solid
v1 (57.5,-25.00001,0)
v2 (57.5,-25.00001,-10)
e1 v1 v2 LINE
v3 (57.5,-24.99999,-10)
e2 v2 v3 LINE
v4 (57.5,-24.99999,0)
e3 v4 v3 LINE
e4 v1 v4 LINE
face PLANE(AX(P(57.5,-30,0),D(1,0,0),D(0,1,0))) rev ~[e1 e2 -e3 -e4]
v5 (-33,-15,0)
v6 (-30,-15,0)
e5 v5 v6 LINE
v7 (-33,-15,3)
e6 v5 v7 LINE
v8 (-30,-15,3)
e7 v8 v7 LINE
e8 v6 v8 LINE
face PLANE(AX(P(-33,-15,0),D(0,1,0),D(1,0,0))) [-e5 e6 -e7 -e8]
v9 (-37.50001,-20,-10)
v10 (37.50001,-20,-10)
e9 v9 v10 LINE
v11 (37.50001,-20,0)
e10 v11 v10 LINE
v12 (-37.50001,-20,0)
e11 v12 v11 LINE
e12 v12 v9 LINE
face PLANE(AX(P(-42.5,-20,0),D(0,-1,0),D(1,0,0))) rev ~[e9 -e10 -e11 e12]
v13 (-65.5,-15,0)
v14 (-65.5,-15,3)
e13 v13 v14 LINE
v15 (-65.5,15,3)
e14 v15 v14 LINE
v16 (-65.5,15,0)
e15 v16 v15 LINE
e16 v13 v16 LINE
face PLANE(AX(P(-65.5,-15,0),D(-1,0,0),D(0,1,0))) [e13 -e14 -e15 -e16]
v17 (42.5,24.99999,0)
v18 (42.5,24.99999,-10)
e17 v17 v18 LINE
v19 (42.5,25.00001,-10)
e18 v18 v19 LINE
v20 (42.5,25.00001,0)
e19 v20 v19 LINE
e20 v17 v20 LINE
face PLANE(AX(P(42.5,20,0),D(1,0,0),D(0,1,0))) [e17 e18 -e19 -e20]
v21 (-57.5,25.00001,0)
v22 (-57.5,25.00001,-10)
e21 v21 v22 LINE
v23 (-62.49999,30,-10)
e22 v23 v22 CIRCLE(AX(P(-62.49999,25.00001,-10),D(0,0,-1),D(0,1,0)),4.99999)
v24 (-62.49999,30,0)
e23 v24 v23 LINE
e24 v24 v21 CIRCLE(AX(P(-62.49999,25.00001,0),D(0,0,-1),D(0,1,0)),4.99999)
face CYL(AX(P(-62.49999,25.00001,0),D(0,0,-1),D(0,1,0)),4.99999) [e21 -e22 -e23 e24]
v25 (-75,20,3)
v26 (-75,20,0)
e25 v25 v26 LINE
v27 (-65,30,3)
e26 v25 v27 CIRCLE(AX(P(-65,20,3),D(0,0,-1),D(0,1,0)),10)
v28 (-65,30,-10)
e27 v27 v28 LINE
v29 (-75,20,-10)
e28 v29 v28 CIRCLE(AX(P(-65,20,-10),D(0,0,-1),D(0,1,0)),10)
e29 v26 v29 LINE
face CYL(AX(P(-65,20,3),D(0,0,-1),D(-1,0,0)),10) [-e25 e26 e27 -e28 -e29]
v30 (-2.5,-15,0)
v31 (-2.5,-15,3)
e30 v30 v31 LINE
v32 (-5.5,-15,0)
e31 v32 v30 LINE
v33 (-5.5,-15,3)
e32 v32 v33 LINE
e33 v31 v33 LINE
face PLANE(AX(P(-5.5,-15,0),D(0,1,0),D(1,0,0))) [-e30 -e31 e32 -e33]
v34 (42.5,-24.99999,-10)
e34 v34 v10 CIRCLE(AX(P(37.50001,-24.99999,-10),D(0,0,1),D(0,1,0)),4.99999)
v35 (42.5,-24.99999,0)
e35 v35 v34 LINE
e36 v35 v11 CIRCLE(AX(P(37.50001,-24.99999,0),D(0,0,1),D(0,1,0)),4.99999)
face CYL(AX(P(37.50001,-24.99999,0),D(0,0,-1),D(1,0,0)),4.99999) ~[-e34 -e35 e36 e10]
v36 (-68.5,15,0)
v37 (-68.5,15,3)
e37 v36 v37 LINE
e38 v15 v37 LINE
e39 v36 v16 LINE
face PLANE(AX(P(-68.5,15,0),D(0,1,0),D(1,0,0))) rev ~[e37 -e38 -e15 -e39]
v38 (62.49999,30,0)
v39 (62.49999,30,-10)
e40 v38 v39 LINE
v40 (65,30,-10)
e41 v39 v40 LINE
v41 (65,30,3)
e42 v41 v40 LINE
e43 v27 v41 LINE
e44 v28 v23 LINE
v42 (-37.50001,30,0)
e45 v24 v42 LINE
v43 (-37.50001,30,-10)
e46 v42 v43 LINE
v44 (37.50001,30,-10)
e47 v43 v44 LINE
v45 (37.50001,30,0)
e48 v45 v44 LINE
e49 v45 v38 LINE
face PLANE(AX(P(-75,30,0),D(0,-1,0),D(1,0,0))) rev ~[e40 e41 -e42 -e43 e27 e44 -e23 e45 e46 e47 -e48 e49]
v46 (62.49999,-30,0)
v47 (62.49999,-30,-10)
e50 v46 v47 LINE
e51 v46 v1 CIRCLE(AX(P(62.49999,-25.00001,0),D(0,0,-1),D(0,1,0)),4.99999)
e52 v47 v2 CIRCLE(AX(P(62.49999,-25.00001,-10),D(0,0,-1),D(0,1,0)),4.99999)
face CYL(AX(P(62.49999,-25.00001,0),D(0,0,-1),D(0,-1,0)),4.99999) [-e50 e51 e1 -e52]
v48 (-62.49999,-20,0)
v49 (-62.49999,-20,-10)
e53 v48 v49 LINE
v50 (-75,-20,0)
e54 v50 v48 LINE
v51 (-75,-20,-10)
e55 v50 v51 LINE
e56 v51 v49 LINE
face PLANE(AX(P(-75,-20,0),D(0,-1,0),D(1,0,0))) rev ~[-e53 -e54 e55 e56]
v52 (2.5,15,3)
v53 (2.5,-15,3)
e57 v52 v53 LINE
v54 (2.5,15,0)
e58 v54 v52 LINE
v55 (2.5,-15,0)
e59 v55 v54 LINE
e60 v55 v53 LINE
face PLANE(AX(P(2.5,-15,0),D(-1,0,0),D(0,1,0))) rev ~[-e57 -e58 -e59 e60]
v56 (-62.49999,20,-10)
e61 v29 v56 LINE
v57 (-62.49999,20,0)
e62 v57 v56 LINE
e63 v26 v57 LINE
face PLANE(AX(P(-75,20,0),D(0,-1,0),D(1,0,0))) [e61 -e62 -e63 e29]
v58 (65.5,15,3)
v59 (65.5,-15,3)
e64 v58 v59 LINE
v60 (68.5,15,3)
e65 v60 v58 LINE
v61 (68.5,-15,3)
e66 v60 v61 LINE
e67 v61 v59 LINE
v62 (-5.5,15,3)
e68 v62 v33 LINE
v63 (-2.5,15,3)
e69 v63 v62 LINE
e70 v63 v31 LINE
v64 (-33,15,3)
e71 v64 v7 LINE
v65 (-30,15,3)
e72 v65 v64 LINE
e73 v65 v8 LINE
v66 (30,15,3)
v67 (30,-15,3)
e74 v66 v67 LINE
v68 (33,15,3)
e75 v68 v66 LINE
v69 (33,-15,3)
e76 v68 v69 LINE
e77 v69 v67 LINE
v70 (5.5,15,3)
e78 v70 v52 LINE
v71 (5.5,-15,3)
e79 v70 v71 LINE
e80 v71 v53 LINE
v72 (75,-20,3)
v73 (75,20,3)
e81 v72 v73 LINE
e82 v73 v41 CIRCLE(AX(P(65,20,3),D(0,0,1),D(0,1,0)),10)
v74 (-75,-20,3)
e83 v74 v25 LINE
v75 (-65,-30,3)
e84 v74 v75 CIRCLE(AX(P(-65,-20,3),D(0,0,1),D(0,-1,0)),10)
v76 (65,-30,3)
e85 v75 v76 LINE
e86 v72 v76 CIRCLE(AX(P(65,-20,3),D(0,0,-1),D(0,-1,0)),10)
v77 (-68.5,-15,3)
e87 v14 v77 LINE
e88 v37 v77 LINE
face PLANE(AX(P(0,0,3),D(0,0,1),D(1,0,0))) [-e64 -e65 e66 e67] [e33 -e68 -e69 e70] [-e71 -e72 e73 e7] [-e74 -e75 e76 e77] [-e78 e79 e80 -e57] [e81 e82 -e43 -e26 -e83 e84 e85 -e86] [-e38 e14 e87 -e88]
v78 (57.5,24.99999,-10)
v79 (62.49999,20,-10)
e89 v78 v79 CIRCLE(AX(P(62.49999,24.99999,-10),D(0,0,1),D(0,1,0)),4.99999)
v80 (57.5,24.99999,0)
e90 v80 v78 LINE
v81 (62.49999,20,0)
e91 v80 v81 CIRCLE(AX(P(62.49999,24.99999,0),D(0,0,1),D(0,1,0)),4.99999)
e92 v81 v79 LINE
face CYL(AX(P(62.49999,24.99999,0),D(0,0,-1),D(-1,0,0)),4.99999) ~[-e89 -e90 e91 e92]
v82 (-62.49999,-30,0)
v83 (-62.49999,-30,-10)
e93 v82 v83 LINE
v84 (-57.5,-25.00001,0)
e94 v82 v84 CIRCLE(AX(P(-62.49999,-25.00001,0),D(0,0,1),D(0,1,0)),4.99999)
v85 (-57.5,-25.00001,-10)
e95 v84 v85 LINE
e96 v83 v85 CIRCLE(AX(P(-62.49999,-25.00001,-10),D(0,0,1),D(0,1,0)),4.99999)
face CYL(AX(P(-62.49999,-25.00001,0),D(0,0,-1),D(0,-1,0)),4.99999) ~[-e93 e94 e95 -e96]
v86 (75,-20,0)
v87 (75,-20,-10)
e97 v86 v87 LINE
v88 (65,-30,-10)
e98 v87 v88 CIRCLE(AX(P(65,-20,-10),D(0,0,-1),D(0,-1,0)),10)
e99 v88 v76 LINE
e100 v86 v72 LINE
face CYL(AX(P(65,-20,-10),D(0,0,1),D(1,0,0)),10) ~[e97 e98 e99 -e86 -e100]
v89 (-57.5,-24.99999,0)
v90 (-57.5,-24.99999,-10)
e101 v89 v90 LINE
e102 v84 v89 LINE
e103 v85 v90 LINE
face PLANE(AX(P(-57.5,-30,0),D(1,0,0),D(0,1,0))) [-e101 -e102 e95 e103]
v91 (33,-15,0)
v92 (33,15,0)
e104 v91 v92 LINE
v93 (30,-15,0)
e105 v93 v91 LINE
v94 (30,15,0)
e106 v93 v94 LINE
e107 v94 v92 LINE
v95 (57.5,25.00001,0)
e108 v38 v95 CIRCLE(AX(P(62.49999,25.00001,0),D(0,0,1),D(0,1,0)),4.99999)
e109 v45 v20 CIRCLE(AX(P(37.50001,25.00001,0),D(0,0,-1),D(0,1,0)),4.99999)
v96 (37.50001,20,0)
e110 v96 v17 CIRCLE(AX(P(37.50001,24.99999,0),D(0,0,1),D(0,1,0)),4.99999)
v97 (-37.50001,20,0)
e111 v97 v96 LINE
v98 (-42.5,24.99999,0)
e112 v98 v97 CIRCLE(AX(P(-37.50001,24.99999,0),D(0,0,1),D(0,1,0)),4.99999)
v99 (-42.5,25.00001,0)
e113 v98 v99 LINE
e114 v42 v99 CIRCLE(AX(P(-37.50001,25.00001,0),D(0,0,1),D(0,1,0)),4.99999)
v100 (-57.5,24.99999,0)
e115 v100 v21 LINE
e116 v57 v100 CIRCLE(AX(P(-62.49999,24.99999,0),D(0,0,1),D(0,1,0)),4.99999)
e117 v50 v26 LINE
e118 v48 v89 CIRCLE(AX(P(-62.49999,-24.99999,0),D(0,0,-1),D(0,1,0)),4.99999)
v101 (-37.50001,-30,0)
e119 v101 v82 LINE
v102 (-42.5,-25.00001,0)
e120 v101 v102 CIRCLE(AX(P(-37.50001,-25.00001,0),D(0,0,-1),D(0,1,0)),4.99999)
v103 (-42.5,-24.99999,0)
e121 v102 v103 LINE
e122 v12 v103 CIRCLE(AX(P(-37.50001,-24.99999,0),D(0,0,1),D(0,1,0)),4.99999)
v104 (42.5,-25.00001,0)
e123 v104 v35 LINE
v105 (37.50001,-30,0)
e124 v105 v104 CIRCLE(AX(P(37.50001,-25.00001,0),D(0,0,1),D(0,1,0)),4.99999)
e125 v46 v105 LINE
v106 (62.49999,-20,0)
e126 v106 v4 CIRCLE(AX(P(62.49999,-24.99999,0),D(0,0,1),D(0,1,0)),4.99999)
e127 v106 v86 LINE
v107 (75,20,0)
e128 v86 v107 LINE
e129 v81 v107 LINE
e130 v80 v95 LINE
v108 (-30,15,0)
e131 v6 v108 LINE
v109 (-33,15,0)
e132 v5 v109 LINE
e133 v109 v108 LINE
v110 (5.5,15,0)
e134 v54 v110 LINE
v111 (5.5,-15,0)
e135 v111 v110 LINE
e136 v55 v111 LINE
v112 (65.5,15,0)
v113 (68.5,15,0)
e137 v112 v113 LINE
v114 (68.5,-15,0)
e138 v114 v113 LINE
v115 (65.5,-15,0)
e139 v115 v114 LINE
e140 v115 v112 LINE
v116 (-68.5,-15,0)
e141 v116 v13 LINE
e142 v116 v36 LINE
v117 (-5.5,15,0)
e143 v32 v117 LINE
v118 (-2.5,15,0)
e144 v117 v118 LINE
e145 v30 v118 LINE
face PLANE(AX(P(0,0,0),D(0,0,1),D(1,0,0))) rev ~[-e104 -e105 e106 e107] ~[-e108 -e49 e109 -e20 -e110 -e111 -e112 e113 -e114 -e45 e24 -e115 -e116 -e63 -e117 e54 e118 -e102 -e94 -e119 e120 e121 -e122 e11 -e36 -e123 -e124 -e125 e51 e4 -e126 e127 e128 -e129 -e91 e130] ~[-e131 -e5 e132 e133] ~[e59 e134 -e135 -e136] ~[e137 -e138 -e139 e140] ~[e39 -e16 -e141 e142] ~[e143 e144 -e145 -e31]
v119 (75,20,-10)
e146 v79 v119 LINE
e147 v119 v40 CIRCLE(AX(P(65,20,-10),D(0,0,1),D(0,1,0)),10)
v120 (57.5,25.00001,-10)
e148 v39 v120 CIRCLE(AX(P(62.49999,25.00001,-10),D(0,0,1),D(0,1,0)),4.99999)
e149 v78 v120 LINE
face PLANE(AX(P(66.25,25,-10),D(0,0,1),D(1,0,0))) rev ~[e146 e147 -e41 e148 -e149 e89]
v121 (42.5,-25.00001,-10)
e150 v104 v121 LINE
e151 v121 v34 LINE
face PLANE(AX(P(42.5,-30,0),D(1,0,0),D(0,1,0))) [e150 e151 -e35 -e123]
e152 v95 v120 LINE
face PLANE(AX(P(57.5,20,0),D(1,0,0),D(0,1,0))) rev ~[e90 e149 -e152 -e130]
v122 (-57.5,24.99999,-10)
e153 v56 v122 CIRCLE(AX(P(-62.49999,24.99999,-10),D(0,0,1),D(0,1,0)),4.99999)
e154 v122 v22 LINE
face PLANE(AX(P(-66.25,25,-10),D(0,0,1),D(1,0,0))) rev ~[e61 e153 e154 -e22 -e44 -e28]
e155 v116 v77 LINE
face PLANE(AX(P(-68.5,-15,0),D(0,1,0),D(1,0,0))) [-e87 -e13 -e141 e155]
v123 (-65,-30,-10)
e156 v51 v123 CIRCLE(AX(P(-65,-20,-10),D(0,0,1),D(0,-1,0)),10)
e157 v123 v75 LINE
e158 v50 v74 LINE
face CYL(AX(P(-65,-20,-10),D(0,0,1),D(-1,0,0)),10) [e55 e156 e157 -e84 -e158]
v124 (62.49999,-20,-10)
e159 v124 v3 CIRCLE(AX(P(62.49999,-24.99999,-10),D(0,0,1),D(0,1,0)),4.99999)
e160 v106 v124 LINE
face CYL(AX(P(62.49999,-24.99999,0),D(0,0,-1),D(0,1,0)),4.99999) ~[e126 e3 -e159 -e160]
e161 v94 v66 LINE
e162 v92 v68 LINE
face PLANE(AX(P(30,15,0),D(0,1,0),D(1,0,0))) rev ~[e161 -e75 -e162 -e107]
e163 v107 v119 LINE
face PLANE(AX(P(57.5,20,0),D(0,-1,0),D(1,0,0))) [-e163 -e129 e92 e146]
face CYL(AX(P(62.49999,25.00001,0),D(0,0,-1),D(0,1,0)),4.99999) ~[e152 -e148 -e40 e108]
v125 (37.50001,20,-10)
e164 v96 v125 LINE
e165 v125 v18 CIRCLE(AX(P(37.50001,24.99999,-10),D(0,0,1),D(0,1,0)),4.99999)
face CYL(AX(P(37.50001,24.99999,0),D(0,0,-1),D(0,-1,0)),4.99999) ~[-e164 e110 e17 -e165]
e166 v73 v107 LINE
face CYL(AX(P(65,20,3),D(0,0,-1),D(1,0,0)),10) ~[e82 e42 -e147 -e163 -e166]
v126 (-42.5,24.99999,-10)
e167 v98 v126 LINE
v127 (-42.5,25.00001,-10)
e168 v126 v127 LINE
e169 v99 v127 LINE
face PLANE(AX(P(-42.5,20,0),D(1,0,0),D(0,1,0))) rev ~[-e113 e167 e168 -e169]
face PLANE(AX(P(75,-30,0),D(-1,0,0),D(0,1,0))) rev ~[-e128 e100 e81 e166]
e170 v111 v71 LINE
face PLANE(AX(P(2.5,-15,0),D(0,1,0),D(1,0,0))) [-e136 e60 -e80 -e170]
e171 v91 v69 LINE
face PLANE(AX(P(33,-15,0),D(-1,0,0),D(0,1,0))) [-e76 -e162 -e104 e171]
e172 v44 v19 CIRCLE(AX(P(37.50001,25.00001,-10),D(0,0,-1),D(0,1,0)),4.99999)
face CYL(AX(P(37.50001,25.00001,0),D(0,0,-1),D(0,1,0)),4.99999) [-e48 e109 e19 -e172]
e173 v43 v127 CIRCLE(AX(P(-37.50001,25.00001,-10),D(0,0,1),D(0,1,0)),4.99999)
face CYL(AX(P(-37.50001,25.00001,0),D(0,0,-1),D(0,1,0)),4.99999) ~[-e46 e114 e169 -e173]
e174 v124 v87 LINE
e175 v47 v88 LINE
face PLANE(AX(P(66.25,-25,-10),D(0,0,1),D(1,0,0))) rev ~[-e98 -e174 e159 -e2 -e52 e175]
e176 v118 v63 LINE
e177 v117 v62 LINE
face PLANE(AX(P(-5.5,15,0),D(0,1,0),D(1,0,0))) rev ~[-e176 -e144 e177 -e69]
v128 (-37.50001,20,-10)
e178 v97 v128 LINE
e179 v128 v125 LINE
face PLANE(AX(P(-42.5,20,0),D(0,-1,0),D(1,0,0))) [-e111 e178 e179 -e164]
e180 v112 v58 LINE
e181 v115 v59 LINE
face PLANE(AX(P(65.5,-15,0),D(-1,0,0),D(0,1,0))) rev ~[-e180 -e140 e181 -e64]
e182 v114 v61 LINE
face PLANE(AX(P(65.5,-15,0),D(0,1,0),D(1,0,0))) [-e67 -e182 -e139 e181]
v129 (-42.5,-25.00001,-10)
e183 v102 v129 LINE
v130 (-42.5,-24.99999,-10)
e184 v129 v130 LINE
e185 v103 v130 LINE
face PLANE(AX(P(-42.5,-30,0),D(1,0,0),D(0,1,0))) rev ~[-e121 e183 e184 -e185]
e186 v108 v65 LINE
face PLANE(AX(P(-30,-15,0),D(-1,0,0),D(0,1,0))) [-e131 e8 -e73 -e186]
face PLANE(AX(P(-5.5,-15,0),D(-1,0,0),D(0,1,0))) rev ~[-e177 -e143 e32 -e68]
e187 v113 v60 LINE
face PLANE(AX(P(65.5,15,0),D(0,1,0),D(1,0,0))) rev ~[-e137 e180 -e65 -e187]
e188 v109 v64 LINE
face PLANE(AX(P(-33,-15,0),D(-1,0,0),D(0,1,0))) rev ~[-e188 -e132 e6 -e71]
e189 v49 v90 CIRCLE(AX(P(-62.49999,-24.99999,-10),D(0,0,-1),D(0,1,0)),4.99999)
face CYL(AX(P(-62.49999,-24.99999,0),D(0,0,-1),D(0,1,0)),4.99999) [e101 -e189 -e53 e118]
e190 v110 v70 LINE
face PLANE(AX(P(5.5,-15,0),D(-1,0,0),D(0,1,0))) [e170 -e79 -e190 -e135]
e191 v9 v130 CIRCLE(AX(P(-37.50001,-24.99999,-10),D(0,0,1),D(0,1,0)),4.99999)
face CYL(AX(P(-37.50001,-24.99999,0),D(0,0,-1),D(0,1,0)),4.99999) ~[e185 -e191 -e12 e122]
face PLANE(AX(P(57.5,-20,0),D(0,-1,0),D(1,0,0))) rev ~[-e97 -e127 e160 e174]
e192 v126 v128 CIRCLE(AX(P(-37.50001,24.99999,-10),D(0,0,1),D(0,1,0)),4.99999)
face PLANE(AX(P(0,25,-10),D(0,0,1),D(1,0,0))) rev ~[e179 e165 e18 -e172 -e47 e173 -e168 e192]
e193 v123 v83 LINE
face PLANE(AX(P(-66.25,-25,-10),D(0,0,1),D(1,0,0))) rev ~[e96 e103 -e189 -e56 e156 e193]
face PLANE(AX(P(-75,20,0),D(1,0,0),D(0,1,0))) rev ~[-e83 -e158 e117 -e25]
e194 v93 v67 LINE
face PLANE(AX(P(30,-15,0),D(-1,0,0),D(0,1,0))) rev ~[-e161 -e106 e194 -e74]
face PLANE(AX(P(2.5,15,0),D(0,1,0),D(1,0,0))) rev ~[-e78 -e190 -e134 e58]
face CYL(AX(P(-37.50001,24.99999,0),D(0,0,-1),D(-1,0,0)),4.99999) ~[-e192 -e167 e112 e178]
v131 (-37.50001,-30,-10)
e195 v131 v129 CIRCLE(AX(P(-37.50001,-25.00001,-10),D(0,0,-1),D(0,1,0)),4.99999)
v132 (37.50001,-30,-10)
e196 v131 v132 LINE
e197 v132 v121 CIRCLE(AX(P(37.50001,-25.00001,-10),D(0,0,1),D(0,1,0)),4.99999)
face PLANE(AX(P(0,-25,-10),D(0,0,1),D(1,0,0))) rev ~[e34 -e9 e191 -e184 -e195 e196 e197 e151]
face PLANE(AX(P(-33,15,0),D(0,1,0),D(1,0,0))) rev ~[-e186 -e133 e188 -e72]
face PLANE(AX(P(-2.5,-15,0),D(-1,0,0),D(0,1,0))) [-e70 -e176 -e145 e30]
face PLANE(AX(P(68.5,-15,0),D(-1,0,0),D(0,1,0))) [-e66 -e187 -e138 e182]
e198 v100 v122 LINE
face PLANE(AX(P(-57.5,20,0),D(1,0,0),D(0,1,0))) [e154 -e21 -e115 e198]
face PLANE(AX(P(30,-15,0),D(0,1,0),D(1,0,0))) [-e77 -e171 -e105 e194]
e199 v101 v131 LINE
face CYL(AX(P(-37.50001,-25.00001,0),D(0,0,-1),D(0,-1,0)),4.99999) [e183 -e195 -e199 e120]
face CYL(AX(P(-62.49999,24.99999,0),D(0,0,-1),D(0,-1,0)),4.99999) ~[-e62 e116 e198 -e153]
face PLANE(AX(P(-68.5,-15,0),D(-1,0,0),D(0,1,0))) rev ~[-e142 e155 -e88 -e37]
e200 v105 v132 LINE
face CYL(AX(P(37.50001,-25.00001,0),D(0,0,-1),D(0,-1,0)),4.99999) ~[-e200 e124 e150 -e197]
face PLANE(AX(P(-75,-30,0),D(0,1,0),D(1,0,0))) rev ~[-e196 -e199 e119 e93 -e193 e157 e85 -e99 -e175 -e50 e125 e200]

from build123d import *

# Parameters (mm, degrees)
F0_W     = 150
F0_H     = 60
F1_DEPTH = 3
F2_W     = 3
F2_H     = 30
F3_DEPTH = 25
F4_W     = 17.5
F4_H     = 10
F4_W_2   = 85
F5_DEPTH = 10
F6_R     = 10
F7_R     = 4.99999


# Not quite as in the source:
# - a fillet or chamfer is up to 0.001 mm smaller than in the source, because OpenCascade refuses the exact size


with BuildPart() as f1:
    # F0 (on Top) → F1 (new body)
    with BuildSketch(Plane.XY):
        Rectangle(F0_W, F0_H)
    extrude(amount=F1_DEPTH)

    # F2 (on Top) → F3 (cut)
    with BuildSketch(Plane.XY):
        with Locations((-67, 0)):
            Rectangle(F2_W, F2_H)
        with Locations((-31.5, 0)):
            Rectangle(F2_W, F2_H)
        with Locations((-4, 0)):
            Rectangle(F2_W, F2_H)
        with Locations((4, 0)):
            Rectangle(F2_W, F2_H)
        with Locations((31.5, 0)):
            Rectangle(F2_W, F2_H)
        with Locations((67, 0)):
            Rectangle(F2_W, F2_H)
    extrude(amount=F3_DEPTH, mode=Mode.SUBTRACT)

    # F4 (on Top) → F5 (join)
    with BuildSketch(Plane.XY):
        with Locations((-66.25, 25)):
            Rectangle(F4_W, F4_H)
        with Locations((66.25, 25)):
            Rectangle(F4_W, F4_H)
        with Locations((-66.25, -25)):
            Rectangle(F4_W, F4_H)
        with Locations((66.25, -25)):
            Rectangle(F4_W, F4_H)
        with Locations((0, 25)):
            Rectangle(F4_W_2, F4_H)
        with Locations((0, -25)):
            Rectangle(F4_W_2, F4_H)
    extrude(amount=-F5_DEPTH)

    # F6
    f6_edges = [f1.edges().sort_by_distance(p)[0] for p in [
        (-75, 30, -3.5),
        (-75, -30, -3.5),
        (75, -30, -3.5),
        (75, 30, -3.5),
    ]]
    fillet(f6_edges, radius=F6_R)

    # F7 (radius 5 in the source; OpenCascade refuses exactly that, so slightly less here)
    f7_edges = [f1.edges().sort_by_distance(p)[0] for p in [
        (57.5, 20, -5),
        (42.5, 20, -5),
        (57.5, -20, -5),
        (42.5, -20, -5),
        (42.5, -30, -5),
        (57.5, -30, -5),
        (57.5, 30, -5),
        (42.5, 30, -5),
        (-42.5, 20, -5),
        (-42.5, -30, -5),
        (-42.5, -20, -5),
        (-57.5, -20, -5),
        (-57.5, -30, -5),
        (-57.5, 20, -5),
        (-42.5, 30, -5),
        (-57.5, 30, -5),
    ]]
    fillet(f7_edges, radius=F7_R)


solid = f1.part
